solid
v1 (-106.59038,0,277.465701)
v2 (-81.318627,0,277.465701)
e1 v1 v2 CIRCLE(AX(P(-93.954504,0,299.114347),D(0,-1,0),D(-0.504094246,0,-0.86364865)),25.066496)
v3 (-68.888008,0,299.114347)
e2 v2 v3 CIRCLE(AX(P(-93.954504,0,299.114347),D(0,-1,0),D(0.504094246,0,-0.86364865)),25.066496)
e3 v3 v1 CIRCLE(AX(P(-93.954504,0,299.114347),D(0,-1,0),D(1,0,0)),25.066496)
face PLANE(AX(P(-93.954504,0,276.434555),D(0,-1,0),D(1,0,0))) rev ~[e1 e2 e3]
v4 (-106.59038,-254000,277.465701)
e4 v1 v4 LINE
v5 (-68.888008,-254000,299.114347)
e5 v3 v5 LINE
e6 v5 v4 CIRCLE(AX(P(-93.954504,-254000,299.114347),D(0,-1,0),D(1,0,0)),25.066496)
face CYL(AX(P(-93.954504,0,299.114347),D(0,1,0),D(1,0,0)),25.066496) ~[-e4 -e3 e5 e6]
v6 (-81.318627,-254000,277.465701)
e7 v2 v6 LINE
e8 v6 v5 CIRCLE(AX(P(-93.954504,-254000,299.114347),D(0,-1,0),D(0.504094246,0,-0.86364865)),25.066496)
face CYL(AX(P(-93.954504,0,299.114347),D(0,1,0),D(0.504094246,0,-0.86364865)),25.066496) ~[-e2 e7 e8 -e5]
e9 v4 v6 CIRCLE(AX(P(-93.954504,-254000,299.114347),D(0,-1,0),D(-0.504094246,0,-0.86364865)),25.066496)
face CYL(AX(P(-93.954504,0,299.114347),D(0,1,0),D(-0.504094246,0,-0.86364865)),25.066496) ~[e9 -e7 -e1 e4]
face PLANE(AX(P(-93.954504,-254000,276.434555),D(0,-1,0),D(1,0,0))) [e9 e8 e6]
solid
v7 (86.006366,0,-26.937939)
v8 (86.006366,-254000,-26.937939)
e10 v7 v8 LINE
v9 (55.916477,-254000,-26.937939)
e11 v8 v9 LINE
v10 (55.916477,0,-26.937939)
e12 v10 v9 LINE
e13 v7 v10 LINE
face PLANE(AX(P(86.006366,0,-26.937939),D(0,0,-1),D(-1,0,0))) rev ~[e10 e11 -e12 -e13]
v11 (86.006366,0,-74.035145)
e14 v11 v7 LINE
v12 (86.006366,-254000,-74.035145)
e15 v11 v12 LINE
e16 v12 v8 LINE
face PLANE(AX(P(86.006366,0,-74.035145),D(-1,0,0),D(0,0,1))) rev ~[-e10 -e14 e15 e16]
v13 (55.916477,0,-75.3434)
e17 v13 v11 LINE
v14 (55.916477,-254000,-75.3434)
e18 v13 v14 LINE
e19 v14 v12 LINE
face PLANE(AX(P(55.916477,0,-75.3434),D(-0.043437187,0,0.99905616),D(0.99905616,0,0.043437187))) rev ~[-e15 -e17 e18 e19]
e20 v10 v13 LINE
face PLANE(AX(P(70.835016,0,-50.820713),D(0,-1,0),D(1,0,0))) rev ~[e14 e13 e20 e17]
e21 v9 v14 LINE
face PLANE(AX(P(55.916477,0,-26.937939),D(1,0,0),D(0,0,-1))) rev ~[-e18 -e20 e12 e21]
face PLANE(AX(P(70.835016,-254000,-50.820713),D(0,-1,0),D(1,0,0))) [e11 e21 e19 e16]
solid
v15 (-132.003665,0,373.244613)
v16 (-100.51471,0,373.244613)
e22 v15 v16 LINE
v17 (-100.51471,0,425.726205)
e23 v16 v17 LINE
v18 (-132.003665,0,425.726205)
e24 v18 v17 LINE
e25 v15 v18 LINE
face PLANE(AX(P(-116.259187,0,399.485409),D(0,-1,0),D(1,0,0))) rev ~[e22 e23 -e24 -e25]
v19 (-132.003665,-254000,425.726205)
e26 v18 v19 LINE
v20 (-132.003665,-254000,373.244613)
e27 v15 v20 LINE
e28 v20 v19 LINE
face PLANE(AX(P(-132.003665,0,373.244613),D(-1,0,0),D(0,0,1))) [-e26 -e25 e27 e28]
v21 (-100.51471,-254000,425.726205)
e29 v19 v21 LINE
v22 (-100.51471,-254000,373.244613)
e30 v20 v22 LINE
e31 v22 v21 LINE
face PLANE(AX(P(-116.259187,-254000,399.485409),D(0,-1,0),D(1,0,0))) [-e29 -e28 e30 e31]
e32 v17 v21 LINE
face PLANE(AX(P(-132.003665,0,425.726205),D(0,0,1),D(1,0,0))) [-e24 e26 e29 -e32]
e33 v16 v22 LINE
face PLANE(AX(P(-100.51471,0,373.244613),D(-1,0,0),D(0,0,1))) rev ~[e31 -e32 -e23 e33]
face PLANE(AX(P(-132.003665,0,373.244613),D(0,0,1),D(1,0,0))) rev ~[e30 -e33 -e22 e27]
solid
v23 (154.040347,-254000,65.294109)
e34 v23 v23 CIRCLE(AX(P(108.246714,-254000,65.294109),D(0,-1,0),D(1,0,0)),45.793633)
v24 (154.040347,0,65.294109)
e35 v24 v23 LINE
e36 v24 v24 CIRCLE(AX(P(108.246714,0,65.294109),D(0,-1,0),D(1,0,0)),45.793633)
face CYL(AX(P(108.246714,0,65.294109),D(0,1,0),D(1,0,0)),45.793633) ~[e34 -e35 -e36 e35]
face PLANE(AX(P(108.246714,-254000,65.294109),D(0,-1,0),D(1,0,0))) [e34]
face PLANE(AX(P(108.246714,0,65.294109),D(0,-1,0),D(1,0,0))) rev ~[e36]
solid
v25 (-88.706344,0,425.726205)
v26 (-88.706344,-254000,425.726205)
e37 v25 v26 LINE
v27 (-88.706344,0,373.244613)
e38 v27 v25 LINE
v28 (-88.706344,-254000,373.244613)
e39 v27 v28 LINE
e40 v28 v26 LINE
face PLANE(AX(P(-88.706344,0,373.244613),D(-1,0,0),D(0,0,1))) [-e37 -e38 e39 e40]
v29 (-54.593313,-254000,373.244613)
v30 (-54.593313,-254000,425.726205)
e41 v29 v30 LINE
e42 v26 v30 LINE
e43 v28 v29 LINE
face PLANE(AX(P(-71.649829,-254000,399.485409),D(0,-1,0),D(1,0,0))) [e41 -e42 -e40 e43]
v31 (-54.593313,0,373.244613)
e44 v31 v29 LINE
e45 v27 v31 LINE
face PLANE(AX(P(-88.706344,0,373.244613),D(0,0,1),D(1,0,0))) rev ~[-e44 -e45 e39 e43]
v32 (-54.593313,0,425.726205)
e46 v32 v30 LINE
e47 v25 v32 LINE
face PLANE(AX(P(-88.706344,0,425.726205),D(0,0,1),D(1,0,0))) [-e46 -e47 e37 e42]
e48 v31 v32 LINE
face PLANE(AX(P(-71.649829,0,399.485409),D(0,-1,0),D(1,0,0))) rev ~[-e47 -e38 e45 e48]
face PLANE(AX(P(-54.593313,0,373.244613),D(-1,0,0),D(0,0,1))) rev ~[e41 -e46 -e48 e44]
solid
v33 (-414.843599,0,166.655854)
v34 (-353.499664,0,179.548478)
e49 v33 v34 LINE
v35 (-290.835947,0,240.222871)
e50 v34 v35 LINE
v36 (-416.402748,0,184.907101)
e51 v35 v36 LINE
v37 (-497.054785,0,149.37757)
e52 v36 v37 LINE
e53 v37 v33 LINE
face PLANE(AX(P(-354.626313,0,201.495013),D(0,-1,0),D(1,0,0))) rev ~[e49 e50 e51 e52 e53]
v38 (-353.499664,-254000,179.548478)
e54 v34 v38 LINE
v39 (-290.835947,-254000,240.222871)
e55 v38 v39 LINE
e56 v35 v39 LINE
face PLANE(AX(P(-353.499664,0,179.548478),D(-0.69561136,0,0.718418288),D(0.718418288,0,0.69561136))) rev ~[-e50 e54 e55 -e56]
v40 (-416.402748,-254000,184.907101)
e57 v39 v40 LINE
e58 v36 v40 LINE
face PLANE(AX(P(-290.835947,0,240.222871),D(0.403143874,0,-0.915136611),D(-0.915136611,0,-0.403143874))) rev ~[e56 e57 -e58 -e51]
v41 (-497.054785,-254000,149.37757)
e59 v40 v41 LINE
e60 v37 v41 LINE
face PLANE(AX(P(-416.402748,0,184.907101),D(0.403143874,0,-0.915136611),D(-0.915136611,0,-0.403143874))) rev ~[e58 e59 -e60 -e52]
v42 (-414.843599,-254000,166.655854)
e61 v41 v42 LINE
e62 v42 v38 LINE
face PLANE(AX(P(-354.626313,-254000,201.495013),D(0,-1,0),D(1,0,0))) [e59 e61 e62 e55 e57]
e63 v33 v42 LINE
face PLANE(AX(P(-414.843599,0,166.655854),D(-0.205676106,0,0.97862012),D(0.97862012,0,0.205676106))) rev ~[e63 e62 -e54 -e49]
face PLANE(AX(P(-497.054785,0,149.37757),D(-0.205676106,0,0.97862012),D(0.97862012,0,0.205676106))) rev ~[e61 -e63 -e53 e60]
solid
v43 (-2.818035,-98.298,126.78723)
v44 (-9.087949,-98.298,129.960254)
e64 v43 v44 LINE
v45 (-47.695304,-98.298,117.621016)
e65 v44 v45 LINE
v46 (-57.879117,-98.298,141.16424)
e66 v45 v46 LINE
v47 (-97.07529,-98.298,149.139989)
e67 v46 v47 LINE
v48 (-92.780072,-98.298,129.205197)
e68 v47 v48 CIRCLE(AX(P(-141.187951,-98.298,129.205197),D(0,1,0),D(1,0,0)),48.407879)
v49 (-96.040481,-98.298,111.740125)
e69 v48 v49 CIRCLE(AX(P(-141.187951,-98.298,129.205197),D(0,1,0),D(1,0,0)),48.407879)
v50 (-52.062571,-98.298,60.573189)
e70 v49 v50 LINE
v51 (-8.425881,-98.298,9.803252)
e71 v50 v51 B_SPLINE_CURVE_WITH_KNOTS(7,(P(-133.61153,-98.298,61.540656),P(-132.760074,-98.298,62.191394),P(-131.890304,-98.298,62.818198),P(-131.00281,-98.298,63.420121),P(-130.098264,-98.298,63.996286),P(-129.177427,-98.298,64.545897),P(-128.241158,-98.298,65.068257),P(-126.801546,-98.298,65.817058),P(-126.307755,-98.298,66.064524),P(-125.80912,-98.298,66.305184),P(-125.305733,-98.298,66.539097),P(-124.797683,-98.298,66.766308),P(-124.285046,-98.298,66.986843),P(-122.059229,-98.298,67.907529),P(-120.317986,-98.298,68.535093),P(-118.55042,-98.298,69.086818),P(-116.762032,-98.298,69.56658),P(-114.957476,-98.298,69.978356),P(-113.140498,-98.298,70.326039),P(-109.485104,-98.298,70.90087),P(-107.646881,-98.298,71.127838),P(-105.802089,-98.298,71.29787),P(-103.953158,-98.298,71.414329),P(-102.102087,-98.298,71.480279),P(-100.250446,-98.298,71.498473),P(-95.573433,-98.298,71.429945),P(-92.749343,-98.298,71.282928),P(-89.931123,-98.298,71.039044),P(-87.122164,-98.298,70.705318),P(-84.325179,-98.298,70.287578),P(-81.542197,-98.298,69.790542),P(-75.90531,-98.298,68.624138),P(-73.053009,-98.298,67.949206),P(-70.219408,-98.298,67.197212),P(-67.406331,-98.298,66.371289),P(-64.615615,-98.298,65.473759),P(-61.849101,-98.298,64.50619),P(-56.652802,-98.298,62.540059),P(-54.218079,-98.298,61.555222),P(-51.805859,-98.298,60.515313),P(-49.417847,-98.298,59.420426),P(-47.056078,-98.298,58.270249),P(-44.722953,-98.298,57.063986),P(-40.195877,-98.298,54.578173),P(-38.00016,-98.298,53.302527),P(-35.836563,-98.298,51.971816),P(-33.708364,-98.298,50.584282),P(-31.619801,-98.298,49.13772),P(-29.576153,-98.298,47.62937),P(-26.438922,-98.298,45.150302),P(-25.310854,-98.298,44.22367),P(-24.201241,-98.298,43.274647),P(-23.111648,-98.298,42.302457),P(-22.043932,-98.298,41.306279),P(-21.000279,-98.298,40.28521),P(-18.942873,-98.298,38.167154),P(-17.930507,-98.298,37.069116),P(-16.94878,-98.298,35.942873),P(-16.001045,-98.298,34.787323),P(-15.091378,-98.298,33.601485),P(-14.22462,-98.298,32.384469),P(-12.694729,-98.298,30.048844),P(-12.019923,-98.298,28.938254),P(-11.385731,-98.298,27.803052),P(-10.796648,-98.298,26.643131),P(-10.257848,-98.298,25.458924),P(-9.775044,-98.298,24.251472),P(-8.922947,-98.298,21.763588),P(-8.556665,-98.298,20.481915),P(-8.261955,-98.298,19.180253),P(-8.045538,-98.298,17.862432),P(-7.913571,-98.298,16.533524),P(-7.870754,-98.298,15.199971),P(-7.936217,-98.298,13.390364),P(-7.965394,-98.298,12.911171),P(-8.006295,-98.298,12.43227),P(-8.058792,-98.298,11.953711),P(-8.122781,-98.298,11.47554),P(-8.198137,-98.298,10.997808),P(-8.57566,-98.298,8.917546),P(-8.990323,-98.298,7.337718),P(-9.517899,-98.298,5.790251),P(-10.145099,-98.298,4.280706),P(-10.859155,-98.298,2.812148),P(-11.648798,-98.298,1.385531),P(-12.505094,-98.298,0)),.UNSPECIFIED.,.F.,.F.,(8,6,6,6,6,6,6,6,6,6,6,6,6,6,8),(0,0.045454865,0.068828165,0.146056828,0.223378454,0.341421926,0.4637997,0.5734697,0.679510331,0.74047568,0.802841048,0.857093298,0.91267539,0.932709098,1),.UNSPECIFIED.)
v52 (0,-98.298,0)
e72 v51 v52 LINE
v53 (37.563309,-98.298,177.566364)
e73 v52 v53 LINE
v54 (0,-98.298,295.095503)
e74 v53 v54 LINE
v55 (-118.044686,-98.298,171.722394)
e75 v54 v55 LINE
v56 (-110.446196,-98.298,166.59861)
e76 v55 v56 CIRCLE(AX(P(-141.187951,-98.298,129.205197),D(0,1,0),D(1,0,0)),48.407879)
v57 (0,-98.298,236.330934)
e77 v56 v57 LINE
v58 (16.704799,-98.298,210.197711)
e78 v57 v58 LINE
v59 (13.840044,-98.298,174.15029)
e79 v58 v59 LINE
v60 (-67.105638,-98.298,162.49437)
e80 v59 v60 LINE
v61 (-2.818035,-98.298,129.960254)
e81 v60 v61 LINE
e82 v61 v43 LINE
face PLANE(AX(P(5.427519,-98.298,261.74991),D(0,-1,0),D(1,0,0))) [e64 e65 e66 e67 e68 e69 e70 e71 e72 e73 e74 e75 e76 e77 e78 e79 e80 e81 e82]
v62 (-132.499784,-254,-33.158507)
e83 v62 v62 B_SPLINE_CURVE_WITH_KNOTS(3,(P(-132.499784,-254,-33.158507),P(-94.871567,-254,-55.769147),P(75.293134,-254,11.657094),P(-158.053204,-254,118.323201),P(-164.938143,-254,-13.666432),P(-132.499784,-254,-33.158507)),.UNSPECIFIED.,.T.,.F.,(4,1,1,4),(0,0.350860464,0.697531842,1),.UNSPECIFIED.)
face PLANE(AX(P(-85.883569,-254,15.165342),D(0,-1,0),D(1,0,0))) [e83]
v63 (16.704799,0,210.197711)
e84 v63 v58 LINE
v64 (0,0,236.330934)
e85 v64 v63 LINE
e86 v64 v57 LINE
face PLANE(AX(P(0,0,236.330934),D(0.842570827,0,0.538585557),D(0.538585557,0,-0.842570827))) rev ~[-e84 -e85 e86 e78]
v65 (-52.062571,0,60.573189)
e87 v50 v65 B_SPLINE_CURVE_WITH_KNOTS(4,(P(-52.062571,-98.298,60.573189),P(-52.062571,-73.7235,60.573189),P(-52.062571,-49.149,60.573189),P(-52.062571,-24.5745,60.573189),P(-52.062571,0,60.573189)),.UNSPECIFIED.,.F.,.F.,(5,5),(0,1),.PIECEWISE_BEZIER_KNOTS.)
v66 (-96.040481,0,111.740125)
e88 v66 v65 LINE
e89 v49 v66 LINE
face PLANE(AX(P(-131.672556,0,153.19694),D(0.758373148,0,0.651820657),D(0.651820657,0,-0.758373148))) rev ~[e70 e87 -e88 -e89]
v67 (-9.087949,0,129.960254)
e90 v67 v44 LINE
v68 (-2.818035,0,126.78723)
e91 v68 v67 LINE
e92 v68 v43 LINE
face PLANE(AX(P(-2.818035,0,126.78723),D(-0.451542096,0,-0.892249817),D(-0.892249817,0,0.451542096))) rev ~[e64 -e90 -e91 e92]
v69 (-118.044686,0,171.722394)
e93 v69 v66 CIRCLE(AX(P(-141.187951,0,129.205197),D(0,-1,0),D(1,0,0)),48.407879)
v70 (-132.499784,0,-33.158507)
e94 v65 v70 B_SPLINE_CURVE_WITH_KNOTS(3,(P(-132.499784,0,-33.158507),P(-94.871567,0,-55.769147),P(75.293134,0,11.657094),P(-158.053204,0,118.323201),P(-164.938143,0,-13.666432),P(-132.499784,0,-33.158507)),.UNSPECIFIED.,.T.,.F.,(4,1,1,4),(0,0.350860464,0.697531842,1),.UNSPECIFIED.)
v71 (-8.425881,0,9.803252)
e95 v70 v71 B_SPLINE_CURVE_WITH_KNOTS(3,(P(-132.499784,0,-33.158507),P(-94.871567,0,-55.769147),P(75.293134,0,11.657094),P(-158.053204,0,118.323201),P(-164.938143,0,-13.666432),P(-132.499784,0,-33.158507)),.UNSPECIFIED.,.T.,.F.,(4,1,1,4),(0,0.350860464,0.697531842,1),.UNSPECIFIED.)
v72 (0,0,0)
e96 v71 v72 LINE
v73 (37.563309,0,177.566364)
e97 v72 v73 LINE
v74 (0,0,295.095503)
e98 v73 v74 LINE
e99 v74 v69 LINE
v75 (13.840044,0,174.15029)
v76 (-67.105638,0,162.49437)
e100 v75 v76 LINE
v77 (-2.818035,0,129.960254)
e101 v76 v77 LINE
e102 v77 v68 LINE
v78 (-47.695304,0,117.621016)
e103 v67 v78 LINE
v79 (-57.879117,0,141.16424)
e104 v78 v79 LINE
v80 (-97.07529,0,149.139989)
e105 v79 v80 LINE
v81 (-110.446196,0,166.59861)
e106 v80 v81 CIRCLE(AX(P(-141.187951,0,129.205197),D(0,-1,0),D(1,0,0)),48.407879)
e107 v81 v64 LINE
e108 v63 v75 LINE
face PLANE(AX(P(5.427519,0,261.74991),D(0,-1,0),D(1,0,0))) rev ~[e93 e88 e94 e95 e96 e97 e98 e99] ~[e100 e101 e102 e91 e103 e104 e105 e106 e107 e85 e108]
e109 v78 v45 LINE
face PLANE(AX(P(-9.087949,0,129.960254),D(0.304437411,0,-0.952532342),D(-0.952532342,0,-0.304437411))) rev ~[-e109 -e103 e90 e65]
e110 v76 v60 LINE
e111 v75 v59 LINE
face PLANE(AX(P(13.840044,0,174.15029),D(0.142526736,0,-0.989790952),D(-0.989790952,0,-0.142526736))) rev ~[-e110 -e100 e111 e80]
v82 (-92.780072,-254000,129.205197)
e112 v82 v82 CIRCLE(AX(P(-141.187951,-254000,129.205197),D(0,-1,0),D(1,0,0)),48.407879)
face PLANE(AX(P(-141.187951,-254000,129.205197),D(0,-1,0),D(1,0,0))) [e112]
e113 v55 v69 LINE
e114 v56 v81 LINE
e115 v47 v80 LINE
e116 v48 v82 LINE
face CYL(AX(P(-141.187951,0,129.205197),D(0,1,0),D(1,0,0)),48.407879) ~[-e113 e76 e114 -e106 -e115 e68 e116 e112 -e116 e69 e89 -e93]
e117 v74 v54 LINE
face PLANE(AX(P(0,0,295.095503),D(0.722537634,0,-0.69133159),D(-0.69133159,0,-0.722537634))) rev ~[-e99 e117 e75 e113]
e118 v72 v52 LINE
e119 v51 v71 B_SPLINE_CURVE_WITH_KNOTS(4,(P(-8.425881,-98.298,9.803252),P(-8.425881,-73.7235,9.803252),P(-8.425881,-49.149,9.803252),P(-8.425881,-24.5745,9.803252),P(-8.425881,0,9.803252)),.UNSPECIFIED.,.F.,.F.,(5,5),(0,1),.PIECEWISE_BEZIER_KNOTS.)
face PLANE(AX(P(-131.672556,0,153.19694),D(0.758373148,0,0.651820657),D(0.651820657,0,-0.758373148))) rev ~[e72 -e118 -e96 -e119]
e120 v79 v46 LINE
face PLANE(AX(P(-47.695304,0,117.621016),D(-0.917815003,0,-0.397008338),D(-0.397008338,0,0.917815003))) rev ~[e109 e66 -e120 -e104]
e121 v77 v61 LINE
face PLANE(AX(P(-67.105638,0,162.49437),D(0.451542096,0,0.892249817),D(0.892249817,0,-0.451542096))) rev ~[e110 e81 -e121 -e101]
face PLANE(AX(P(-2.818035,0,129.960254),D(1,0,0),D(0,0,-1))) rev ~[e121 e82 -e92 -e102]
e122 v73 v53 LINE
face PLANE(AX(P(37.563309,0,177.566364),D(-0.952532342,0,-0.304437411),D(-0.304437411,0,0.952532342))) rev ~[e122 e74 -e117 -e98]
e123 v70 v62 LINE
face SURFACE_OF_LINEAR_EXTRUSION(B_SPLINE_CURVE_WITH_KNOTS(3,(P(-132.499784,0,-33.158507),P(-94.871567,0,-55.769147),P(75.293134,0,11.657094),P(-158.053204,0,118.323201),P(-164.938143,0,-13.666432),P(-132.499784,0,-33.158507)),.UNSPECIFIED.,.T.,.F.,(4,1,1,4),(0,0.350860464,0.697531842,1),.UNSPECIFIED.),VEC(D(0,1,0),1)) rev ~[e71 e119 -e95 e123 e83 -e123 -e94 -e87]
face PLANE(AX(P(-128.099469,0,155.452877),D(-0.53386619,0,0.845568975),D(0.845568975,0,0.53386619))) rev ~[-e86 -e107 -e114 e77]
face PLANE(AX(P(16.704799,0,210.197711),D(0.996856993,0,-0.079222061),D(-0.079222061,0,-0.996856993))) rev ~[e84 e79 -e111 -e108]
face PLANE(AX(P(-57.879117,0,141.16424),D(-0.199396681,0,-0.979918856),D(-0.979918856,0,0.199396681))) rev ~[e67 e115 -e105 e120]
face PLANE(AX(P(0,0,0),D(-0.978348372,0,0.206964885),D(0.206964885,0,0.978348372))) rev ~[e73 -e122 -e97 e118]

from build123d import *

# Parameters (mm, degrees)
F1_DEPTH = 254
F3_DEPTH = 98.298
F4_R     = 45.7936330536
F5_DEPTH = 254000
F4_W     = 34.1130308807
F4_H     = 52.4815917015
F4_W_2   = 31.4889550209
F4_R_2   = 48.4078793894


with BuildPart() as f1:
    # F0 (on Front) → F1 (new body)
    with BuildSketch(Plane.XZ):
        with BuildLine():
            add(Edge.make_bspline(
                [(-132.4997842312, -33.1585071981), (-94.8715670758, -55.7691471996), (75.2931336197, 11.6570935994), (-158.0532035393, 118.3232014636), (-164.9381428441, -13.6664317217), (-132.4997842312, -33.1585071981)],
                knots=[0, 0, 0, 0, 0.3508604639, 0.6975318415, 1, 1, 1, 1], degree=3))
        make_face()
    extrude(amount=F1_DEPTH)

    # F2 (on Front) → F3 (join)
    with BuildSketch(Plane.XZ):
        Polygon((18.7816545367, 236.3309338689), (0, 295.0955033302), (0, 236.3309338689), align=None)
        Polygon((-43.7029358283, 208.7382471013), (0, 295.0955033302), (-133.6115300655, 155.4528772831), (-131.6725555099, 153.1969404377), (-128.0994687707, 155.4528772831), align=None)
        Polygon((0, 236.3309338689), (0, 295.0955033302), (-43.7029358283, 208.7382471013), align=None)
        Polygon((16.7047991803, 210.1977108919), (18.7816545367, 236.3309338689), (0, 236.3309338689), align=None)
        Polygon((37.5633090734, 177.5663644075), (18.7816545367, 236.3309338689), (16.7047991803, 210.1977108919), align=None)
        Polygon((0, 0), (37.5633090734, 177.5663644075), (13.8400442615, 174.1502900454), align=None)
        Polygon((13.8400442615, 174.1502900454), (37.5633090734, 177.5663644075), (16.7047991803, 210.1977108919), align=None)
        Polygon((13.8400442615, 174.1502900454), (0, 172.1573678761), (0, 0), align=None)
        Polygon((0, 0), (0, 172.1573678761), (-67.1056383852, 162.4943702804), (-2.81803512, 129.9602541824), (-2.81803512, 126.7872303724), (-9.087948685, 129.9602541824), (-47.6953043341, 117.6210160492), (-57.8791172117, 141.1642400595), (-123.0878839493, 154.4331057234), (-131.6725555099, 153.1969404377), align=None)
        Polygon((-128.0994687707, 155.4528772831), (-131.6725555099, 153.1969404377), (-123.0878839493, 154.4331057234), align=None)
    extrude(amount=F3_DEPTH)

    # F4 (on Front) → F5, piece 6 (join)
    with BuildSketch(Plane.XZ):
        with Locations((-141.1879509687, 129.2051970959)):
            Circle(F4_R_2)
    extrude(amount=F5_DEPTH)


with BuildPart() as f5:
    # F4 (on Front) → F5 (new body)
    with BuildSketch(Plane.XZ):
        with Locations((108.2467138767, 65.2941092849)):
            Circle(F4_R)
    extrude(amount=F5_DEPTH)


with BuildPart() as f5b:
    # F4 (on Front) → F5, piece 2 (new body)
    with BuildSketch(Plane.XZ):
        Polygon((86.0063657165, -74.0351453424), (86.0063657165, -26.9379392266), (55.9164769948, -26.9379392266), (55.9164769948, -41.9828779995), (55.9164769948, -75.3434002399), align=None)
    extrude(amount=F5_DEPTH)


with BuildPart() as f5c:
    # F4 (on Front) → F5, piece 3 (new body)
    with BuildSketch(Plane.XZ):
        with Locations((-71.6498289257, 399.4854092598)):
            Rectangle(F4_W, F4_H)
    extrude(amount=F5_DEPTH)


with BuildPart() as f5d:
    # F4 (on Front) → F5, piece 4 (new body)
    with BuildSketch(Plane.XZ):
        with Locations((-116.2591874599, 399.4854092598)):
            Rectangle(F4_W_2, F4_H)
    extrude(amount=F5_DEPTH)


with BuildPart() as f5e:
    # F4 (on Front) → F5, piece 5 (new body)
    with BuildSketch(Plane.XZ):
        with BuildLine():
            ThreePointArc((-106.5903799208, 277.4657011032), (-93.9545035362, 274.0478505444), (-81.3186271516, 277.4657011032))
            Line((-81.3186271516, 277.4657011032), (-106.5903799208, 277.4657011032))
        make_face()
        with BuildLine():
            Line((-106.5903799208, 277.4657011032), (-81.3186271516, 277.4657011032))
            ThreePointArc((-81.3186271516, 277.4657011032), (-72.2166751713, 286.6325182054), (-68.8880075764, 299.1143465042))
            ThreePointArc((-68.8880075764, 299.1143465042), (-106.436331835, 320.8521748692), (-106.5903799208, 277.4657011032))
        make_face()
    extrude(amount=F5_DEPTH)


with BuildPart() as f5f:
    # F4 (on Front) → F5, piece 7 (new body)
    with BuildSketch(Plane.XZ):
        Polygon((-290.8359467983, 240.2228713036), (-416.4027481818, 184.9071007683), (-414.843598616, 166.6558539839), (-353.4996639846, 179.548478343), align=None)
        Polygon((-414.843598616, 166.6558539839), (-416.4027481818, 184.9071007683), (-497.05478549, 149.3775695562), align=None)
    extrude(amount=F5_DEPTH)


solid = Compound([f1.part, f5.part, f5b.part, f5c.part, f5d.part, f5e.part, f5f.part])
